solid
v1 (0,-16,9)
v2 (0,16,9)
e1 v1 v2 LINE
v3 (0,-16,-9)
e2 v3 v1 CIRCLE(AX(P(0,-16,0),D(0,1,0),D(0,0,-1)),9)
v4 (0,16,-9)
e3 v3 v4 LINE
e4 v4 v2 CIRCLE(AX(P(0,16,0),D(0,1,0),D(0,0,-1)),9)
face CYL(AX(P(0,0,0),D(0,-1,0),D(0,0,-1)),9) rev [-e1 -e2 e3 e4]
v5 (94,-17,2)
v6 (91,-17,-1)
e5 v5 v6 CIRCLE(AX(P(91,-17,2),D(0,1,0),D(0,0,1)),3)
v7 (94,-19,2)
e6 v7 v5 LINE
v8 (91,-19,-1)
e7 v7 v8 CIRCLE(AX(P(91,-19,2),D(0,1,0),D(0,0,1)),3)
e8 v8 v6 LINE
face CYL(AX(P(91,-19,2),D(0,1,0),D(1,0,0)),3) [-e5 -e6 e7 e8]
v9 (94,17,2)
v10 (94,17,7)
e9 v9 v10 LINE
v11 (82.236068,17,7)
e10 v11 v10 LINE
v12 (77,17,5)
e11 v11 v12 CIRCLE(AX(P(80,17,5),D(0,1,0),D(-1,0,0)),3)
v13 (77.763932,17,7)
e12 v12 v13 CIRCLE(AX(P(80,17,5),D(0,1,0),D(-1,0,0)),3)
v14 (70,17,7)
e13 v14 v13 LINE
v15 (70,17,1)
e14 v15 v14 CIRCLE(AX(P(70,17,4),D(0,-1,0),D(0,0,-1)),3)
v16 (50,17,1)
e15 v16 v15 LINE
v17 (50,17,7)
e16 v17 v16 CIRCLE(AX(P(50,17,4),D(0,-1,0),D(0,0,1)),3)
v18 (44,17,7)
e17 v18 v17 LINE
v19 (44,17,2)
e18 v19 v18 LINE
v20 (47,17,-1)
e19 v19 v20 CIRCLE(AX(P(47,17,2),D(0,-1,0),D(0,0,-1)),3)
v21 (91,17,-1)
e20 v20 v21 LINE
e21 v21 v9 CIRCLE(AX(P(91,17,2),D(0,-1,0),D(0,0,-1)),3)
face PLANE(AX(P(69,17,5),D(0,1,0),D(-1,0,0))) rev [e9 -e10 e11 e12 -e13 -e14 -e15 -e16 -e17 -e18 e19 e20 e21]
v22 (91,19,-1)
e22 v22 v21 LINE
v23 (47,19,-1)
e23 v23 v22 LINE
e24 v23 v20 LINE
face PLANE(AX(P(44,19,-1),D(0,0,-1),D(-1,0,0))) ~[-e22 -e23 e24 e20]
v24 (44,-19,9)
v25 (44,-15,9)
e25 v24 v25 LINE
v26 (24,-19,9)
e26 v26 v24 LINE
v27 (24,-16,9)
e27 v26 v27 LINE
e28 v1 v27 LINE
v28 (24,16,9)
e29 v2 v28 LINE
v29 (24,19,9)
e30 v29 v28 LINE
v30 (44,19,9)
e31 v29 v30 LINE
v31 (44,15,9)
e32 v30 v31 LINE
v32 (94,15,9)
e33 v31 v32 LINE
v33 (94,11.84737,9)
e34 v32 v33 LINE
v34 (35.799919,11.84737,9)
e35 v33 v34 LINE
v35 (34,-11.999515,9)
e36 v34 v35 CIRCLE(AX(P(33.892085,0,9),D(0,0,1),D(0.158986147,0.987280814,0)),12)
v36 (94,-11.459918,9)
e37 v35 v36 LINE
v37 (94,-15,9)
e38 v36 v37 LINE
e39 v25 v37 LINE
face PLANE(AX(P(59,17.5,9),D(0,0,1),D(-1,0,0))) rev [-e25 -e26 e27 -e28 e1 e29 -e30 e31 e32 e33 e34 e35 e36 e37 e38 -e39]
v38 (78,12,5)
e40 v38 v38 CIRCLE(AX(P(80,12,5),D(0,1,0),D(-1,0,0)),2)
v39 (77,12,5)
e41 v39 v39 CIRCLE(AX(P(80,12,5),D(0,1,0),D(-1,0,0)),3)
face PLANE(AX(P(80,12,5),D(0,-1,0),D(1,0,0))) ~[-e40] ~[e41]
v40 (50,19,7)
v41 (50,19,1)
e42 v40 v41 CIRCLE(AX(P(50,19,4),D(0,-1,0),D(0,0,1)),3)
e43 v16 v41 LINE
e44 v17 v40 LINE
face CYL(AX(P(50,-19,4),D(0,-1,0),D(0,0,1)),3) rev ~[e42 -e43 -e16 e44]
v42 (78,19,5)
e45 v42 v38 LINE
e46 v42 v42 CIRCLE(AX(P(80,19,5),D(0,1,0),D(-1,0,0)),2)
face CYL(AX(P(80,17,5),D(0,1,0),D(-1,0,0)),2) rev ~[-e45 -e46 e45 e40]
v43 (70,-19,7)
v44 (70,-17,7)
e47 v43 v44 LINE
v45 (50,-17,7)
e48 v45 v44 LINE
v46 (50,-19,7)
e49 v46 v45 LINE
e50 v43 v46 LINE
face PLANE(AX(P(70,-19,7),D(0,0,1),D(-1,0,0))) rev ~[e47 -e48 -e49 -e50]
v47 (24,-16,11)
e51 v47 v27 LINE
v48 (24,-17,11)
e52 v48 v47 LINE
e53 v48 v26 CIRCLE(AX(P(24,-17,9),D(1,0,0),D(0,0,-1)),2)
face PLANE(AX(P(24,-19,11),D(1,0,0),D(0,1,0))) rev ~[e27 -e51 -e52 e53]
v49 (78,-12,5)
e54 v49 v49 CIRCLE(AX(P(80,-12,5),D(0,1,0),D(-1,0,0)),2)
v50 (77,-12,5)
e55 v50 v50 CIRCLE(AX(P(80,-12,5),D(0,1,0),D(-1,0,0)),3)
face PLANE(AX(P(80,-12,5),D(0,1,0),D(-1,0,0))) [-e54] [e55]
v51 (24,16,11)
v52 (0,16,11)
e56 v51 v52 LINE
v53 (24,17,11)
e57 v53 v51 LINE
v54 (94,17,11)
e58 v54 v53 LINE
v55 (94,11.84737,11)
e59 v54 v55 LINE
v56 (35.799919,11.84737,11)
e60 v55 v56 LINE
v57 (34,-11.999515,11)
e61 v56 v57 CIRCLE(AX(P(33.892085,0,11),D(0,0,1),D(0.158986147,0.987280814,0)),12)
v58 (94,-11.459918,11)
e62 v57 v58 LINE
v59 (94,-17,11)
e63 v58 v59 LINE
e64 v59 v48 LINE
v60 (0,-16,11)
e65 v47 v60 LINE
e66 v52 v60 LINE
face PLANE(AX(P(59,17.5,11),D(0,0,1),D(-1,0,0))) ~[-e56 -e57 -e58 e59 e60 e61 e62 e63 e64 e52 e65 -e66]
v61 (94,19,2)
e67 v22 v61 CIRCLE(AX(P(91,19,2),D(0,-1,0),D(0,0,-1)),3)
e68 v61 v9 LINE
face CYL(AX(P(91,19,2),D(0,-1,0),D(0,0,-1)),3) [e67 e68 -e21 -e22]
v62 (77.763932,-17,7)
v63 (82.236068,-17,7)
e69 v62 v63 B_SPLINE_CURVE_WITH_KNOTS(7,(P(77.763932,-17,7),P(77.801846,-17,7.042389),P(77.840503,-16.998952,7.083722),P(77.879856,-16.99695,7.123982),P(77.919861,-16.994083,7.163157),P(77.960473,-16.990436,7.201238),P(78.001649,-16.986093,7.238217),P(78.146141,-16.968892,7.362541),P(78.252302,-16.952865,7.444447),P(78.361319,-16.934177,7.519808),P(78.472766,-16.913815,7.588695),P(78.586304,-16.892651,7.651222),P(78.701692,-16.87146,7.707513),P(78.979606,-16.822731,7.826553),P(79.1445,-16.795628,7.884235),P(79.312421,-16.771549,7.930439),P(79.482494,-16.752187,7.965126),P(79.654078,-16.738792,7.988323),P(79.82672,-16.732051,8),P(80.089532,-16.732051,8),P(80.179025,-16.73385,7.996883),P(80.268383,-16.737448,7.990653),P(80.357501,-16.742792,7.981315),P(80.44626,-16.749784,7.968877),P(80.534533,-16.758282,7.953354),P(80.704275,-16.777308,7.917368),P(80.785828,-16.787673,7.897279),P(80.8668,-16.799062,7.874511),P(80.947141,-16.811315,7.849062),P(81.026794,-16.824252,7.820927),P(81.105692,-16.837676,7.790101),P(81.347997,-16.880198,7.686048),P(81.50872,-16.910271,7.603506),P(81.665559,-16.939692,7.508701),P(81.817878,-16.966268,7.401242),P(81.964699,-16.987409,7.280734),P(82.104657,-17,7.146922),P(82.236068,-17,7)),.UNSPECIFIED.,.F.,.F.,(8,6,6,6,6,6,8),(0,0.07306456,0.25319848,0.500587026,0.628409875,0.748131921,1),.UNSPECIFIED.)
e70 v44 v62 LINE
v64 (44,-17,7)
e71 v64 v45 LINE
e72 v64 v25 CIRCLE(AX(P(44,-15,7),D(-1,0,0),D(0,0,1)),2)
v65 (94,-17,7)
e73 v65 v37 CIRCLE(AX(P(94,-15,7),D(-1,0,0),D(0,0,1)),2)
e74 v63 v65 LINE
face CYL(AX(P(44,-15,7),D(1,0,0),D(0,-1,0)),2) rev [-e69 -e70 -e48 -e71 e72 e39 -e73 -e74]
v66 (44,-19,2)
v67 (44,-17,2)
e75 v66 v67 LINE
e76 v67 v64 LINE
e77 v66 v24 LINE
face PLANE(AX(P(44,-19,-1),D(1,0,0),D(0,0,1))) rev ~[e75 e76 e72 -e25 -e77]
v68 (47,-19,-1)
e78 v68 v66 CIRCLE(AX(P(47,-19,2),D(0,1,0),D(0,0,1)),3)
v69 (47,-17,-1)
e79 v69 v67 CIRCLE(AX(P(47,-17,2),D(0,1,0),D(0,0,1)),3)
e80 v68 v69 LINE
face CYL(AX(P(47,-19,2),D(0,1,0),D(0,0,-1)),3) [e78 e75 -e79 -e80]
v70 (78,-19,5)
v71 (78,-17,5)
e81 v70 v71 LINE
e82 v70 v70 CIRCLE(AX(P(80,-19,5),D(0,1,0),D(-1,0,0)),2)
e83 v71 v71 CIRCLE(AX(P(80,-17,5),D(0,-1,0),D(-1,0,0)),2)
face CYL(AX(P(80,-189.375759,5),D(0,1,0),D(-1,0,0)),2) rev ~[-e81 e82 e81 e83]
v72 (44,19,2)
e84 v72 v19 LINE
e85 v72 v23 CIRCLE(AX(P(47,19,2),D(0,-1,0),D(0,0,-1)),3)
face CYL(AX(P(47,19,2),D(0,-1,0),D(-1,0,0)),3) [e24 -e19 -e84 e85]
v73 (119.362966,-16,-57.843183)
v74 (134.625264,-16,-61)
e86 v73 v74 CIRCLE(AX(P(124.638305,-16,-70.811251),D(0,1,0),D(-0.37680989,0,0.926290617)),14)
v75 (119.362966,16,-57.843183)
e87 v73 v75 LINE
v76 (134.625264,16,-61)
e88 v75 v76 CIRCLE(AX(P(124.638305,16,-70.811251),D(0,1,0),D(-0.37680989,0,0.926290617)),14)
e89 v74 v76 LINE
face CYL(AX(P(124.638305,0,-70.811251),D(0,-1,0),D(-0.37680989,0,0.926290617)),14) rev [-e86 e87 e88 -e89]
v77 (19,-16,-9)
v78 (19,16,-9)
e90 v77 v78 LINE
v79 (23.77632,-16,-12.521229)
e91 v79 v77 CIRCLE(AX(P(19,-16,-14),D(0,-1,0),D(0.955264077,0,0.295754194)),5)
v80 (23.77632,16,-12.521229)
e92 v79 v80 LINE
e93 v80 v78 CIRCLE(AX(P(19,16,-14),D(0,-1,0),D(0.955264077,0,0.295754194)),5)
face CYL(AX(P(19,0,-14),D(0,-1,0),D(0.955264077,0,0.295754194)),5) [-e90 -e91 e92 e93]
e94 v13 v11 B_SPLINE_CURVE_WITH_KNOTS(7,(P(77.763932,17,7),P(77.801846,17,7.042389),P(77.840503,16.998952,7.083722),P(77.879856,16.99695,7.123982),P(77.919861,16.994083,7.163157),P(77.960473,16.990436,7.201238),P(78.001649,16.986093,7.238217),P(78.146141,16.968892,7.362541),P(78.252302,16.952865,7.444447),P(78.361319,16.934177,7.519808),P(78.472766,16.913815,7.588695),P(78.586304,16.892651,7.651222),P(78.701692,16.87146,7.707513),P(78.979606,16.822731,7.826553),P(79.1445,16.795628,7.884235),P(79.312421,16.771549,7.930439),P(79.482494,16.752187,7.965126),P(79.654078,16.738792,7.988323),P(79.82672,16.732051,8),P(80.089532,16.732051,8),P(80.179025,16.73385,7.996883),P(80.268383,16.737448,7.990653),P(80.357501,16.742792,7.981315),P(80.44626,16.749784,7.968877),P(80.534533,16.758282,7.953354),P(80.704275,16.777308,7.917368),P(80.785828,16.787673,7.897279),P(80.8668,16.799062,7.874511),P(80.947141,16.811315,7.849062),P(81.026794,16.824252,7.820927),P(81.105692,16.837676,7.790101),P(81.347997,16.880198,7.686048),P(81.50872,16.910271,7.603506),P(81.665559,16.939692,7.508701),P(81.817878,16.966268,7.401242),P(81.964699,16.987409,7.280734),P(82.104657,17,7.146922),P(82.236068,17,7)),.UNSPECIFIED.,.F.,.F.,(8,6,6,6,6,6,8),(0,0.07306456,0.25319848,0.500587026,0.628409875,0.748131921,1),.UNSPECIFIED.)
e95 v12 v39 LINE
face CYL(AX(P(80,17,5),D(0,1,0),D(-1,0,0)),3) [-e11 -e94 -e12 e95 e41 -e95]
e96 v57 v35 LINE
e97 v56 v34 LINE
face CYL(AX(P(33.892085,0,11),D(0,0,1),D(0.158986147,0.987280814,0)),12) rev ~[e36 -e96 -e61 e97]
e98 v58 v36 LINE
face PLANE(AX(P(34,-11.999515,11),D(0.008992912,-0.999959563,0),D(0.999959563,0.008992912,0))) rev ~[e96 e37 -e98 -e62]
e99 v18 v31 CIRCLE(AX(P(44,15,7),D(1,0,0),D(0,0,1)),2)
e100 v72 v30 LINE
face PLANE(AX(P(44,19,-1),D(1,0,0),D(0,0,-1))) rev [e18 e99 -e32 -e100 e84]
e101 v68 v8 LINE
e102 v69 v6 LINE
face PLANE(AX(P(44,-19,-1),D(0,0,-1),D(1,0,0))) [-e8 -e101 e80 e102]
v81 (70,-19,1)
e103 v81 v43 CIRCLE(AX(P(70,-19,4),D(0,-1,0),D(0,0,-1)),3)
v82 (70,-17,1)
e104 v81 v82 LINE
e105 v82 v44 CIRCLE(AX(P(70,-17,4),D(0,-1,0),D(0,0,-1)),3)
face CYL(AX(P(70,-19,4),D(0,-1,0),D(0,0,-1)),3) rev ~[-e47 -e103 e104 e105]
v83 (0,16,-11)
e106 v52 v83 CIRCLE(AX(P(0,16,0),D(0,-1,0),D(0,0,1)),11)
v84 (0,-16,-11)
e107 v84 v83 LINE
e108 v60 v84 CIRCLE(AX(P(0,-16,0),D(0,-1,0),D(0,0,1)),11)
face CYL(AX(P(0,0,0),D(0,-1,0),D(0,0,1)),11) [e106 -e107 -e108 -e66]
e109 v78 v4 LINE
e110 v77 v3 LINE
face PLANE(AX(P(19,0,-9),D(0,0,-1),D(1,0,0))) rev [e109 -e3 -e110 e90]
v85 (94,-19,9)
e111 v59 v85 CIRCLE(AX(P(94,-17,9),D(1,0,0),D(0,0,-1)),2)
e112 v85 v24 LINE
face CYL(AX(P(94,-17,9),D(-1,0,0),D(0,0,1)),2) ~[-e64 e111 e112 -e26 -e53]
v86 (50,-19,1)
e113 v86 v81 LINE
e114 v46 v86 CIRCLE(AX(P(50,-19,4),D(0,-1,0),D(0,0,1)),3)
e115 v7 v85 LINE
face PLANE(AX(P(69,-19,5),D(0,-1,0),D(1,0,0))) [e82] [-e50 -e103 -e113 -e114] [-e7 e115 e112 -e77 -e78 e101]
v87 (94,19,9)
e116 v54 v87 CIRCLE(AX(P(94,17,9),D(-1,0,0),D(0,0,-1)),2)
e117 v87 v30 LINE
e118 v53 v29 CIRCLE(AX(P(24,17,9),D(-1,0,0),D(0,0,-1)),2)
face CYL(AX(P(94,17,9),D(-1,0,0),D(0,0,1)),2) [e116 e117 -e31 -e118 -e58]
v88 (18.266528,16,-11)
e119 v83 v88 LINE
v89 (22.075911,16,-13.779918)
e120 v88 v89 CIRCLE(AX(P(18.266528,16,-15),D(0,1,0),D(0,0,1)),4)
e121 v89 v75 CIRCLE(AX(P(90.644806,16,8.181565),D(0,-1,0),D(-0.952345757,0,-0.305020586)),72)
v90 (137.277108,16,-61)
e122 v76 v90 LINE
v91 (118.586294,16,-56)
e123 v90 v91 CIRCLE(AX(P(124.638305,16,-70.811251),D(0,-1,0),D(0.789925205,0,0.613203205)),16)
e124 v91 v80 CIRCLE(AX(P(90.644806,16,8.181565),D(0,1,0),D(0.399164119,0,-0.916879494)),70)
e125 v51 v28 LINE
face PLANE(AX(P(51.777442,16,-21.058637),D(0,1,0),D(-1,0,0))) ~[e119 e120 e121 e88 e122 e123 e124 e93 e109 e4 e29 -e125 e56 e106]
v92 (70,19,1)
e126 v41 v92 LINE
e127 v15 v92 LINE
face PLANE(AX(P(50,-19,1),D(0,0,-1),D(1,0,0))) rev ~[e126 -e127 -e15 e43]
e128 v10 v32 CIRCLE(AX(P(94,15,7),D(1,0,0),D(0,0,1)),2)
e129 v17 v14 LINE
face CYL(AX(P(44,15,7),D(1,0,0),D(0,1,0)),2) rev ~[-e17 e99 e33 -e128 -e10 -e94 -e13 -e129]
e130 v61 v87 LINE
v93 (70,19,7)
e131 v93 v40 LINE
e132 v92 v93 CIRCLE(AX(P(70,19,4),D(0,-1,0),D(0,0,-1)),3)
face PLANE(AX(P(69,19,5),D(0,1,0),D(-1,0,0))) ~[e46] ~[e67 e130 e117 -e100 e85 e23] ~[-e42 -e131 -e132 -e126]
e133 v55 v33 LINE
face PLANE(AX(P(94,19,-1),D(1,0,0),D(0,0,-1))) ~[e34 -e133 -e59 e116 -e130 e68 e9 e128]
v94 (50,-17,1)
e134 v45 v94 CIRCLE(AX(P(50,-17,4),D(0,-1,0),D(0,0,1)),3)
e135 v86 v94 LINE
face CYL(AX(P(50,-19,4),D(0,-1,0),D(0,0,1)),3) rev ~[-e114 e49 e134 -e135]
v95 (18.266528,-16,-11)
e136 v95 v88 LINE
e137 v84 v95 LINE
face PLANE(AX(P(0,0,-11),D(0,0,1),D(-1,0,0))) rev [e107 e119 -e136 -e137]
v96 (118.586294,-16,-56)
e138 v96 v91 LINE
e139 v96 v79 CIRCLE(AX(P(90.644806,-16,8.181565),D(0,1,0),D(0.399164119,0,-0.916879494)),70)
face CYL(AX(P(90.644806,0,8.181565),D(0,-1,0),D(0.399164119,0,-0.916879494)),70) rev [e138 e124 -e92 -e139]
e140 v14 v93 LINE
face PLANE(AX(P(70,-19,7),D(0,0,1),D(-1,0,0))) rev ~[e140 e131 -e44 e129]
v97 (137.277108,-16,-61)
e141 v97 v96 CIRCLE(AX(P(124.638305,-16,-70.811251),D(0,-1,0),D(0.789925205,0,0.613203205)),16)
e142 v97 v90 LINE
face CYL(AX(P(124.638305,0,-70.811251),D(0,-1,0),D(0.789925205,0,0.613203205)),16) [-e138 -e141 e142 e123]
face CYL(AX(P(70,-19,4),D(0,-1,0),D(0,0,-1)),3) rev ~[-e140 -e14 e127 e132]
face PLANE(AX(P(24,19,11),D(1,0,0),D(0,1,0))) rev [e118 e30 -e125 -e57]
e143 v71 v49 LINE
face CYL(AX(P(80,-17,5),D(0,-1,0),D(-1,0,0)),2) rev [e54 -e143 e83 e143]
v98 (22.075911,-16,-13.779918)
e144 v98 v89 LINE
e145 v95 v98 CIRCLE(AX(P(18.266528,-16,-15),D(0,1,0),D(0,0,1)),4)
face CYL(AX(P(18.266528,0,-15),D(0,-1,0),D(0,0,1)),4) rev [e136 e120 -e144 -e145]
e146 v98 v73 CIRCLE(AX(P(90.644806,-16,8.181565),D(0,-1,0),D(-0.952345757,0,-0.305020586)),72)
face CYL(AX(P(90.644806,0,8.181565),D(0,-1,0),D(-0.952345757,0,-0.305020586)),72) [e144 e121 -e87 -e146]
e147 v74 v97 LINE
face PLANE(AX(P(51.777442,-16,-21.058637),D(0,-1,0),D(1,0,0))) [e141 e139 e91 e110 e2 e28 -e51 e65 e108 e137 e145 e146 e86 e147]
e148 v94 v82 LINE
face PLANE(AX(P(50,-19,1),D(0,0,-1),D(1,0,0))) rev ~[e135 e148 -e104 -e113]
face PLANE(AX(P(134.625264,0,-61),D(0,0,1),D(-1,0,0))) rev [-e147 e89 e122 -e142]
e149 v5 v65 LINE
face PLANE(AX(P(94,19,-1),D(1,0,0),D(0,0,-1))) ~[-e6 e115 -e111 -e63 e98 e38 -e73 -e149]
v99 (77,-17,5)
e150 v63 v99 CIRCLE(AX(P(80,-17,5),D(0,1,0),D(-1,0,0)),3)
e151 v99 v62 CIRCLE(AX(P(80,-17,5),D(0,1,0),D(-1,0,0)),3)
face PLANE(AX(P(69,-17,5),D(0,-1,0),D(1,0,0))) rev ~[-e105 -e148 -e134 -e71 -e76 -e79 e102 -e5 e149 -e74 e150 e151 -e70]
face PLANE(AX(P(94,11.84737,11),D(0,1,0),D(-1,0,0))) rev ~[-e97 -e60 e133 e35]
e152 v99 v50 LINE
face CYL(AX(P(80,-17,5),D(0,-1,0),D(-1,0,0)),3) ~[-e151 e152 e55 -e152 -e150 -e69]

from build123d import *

# Parameters (mm, degrees)
F1_DEPTH  = 16
F2_W      = 70
F2_H      = 3
F3_DEPTH  = 2
F4_W      = 50
F4_H      = 12
F5_DEPTH  = 2
F6_R      = 2
F9_DEPTH  = 2
F11_DEPTH = 38.001
F13_D     = 4
F14_R     = 3
F14_R_2   = 2
F15_DEPTH = 5
F16_R     = 3


# Not quite as in the source:
# - a pattern or mirror of a feature is missing from the dataset's text; its kind, count and spacing are read off the source's solid


with BuildPart() as f1:
    # F0 (on Front) → F1 (new body)
    with BuildSketch(Plane.XZ):
        with BuildLine():
            ThreePointArc((0, -9), (-9, 0), (0, 9))
            Line((0, 9), (94, 9))
            Line((94, 9), (94, 11))
            Line((94, 11), (0, 11))
            ThreePointArc((0, 11), (-11, 0), (0, -11))
            Line((0, -11), (18.2665281953, -11))
            ThreePointArc((18.2665281953, -11), (20.6244584971, -11.7688756304), (22.0759112253, -13.779917654))
            ThreePointArc((22.0759112253, -13.779917654), (60.9393672504, -57.4049197249), (119.3629664678, -57.8431826489))
            ThreePointArc((119.3629664678, -57.8431826489), (127.4740086729, -57.1014451531), (134.6252638265, -61))
            Line((134.6252638265, -61), (137.2771081943, -61))
            ThreePointArc((137.2771081943, -61), (128.7730913255, -55.3547464626), (118.5862940723, -56))
            ThreePointArc((118.5862940723, -56), (61.4655553189, -55.4468201567), (23.7763203843, -12.5212290284))
            ThreePointArc((23.7763203843, -12.5212290284), (21.9669972314, -9.9754593518), (19, -9))
            Line((19, -9), (0, -9))
        make_face()
    extrude(amount=F1_DEPTH)

    # F2 (on face) → F3 (join)
    with BuildSketch(Plane.XY.offset(11)):
        with Locations((59, -17.5)):
            Rectangle(F2_W, F2_H)
    extrude(amount=-F3_DEPTH)

    # F4 (on face) → F5 (join)
    with BuildSketch(Plane.XZ.offset(19)):
        with Locations((69, 5)):
            Rectangle(F4_W, F4_H)
    extrude(amount=-F5_DEPTH)

    # F6
    f6_edges = [f1.edges().sort_by_distance(p)[0] for p in [
        (59, -19, 11),
        (69, -17, 9),
    ]]
    fillet(f6_edges, radius=F6_R)

    # F7: F1 across plane


with BuildPart() as f1_1:
    add(f1.part)
    add(f1.part.mirror(Plane.XZ))

    # F8 (on face) → F9 (cut)
    with BuildSketch(Plane.XY.offset(11)):
        with BuildLine():
            Line((94, 11.8473697647), (35.7999188125, 11.8473697647))
            ThreePointArc((35.7999188125, 11.8473697647), (21.9261214029, 0.9031688421), (34, -11.9995147554))
            Line((34, -11.9995147554), (94, -11.4599181938))
            Line((94, -11.4599181938), (94, 11.8473697647))
        make_face()
    extrude(amount=-F9_DEPTH, mode=Mode.SUBTRACT)

    # F10 (on face) → F11 (cut, through all)
    with BuildSketch(Plane.XZ.offset(19)):
        with BuildLine():
            ThreePointArc((50, 7), (47, 4), (50, 1))
            Line((50, 1), (70, 1))
            ThreePointArc((70, 1), (73, 4), (70, 7))
            Line((70, 7), (50, 7))
        make_face()
    extrude(amount=-F11_DEPTH, mode=Mode.SUBTRACT)

    # F13 (through all)
    with Locations(Plane.XZ.offset(19)):
        with Locations((80, 5)):
            Hole(F13_D / 2)

    # F14 (on face) → F15 (join)
    with BuildSketch(Plane(origin=(0, -17, 0), x_dir=(-1, 0, 0), z_dir=(0, 1, 0))):
        with Locations((-80, 5)):
            Circle(F14_R)
        with Locations((-80, 5)):
            Circle(F14_R_2, mode=Mode.SUBTRACT)
    f15 = extrude(amount=F15_DEPTH)

    # F15_copies: F15 across plane
    add(f15.mirror(Plane.ZX))

    # F16
    f16_edges = [f1_1.edges().sort_by_distance(p)[0] for p in [
        (94, -18, -1),
        (94, 18, -1),
        (44, 18, -1),
        (44, -18, -1),
    ]]
    fillet(f16_edges, radius=F16_R)


solid = f1_1.part
